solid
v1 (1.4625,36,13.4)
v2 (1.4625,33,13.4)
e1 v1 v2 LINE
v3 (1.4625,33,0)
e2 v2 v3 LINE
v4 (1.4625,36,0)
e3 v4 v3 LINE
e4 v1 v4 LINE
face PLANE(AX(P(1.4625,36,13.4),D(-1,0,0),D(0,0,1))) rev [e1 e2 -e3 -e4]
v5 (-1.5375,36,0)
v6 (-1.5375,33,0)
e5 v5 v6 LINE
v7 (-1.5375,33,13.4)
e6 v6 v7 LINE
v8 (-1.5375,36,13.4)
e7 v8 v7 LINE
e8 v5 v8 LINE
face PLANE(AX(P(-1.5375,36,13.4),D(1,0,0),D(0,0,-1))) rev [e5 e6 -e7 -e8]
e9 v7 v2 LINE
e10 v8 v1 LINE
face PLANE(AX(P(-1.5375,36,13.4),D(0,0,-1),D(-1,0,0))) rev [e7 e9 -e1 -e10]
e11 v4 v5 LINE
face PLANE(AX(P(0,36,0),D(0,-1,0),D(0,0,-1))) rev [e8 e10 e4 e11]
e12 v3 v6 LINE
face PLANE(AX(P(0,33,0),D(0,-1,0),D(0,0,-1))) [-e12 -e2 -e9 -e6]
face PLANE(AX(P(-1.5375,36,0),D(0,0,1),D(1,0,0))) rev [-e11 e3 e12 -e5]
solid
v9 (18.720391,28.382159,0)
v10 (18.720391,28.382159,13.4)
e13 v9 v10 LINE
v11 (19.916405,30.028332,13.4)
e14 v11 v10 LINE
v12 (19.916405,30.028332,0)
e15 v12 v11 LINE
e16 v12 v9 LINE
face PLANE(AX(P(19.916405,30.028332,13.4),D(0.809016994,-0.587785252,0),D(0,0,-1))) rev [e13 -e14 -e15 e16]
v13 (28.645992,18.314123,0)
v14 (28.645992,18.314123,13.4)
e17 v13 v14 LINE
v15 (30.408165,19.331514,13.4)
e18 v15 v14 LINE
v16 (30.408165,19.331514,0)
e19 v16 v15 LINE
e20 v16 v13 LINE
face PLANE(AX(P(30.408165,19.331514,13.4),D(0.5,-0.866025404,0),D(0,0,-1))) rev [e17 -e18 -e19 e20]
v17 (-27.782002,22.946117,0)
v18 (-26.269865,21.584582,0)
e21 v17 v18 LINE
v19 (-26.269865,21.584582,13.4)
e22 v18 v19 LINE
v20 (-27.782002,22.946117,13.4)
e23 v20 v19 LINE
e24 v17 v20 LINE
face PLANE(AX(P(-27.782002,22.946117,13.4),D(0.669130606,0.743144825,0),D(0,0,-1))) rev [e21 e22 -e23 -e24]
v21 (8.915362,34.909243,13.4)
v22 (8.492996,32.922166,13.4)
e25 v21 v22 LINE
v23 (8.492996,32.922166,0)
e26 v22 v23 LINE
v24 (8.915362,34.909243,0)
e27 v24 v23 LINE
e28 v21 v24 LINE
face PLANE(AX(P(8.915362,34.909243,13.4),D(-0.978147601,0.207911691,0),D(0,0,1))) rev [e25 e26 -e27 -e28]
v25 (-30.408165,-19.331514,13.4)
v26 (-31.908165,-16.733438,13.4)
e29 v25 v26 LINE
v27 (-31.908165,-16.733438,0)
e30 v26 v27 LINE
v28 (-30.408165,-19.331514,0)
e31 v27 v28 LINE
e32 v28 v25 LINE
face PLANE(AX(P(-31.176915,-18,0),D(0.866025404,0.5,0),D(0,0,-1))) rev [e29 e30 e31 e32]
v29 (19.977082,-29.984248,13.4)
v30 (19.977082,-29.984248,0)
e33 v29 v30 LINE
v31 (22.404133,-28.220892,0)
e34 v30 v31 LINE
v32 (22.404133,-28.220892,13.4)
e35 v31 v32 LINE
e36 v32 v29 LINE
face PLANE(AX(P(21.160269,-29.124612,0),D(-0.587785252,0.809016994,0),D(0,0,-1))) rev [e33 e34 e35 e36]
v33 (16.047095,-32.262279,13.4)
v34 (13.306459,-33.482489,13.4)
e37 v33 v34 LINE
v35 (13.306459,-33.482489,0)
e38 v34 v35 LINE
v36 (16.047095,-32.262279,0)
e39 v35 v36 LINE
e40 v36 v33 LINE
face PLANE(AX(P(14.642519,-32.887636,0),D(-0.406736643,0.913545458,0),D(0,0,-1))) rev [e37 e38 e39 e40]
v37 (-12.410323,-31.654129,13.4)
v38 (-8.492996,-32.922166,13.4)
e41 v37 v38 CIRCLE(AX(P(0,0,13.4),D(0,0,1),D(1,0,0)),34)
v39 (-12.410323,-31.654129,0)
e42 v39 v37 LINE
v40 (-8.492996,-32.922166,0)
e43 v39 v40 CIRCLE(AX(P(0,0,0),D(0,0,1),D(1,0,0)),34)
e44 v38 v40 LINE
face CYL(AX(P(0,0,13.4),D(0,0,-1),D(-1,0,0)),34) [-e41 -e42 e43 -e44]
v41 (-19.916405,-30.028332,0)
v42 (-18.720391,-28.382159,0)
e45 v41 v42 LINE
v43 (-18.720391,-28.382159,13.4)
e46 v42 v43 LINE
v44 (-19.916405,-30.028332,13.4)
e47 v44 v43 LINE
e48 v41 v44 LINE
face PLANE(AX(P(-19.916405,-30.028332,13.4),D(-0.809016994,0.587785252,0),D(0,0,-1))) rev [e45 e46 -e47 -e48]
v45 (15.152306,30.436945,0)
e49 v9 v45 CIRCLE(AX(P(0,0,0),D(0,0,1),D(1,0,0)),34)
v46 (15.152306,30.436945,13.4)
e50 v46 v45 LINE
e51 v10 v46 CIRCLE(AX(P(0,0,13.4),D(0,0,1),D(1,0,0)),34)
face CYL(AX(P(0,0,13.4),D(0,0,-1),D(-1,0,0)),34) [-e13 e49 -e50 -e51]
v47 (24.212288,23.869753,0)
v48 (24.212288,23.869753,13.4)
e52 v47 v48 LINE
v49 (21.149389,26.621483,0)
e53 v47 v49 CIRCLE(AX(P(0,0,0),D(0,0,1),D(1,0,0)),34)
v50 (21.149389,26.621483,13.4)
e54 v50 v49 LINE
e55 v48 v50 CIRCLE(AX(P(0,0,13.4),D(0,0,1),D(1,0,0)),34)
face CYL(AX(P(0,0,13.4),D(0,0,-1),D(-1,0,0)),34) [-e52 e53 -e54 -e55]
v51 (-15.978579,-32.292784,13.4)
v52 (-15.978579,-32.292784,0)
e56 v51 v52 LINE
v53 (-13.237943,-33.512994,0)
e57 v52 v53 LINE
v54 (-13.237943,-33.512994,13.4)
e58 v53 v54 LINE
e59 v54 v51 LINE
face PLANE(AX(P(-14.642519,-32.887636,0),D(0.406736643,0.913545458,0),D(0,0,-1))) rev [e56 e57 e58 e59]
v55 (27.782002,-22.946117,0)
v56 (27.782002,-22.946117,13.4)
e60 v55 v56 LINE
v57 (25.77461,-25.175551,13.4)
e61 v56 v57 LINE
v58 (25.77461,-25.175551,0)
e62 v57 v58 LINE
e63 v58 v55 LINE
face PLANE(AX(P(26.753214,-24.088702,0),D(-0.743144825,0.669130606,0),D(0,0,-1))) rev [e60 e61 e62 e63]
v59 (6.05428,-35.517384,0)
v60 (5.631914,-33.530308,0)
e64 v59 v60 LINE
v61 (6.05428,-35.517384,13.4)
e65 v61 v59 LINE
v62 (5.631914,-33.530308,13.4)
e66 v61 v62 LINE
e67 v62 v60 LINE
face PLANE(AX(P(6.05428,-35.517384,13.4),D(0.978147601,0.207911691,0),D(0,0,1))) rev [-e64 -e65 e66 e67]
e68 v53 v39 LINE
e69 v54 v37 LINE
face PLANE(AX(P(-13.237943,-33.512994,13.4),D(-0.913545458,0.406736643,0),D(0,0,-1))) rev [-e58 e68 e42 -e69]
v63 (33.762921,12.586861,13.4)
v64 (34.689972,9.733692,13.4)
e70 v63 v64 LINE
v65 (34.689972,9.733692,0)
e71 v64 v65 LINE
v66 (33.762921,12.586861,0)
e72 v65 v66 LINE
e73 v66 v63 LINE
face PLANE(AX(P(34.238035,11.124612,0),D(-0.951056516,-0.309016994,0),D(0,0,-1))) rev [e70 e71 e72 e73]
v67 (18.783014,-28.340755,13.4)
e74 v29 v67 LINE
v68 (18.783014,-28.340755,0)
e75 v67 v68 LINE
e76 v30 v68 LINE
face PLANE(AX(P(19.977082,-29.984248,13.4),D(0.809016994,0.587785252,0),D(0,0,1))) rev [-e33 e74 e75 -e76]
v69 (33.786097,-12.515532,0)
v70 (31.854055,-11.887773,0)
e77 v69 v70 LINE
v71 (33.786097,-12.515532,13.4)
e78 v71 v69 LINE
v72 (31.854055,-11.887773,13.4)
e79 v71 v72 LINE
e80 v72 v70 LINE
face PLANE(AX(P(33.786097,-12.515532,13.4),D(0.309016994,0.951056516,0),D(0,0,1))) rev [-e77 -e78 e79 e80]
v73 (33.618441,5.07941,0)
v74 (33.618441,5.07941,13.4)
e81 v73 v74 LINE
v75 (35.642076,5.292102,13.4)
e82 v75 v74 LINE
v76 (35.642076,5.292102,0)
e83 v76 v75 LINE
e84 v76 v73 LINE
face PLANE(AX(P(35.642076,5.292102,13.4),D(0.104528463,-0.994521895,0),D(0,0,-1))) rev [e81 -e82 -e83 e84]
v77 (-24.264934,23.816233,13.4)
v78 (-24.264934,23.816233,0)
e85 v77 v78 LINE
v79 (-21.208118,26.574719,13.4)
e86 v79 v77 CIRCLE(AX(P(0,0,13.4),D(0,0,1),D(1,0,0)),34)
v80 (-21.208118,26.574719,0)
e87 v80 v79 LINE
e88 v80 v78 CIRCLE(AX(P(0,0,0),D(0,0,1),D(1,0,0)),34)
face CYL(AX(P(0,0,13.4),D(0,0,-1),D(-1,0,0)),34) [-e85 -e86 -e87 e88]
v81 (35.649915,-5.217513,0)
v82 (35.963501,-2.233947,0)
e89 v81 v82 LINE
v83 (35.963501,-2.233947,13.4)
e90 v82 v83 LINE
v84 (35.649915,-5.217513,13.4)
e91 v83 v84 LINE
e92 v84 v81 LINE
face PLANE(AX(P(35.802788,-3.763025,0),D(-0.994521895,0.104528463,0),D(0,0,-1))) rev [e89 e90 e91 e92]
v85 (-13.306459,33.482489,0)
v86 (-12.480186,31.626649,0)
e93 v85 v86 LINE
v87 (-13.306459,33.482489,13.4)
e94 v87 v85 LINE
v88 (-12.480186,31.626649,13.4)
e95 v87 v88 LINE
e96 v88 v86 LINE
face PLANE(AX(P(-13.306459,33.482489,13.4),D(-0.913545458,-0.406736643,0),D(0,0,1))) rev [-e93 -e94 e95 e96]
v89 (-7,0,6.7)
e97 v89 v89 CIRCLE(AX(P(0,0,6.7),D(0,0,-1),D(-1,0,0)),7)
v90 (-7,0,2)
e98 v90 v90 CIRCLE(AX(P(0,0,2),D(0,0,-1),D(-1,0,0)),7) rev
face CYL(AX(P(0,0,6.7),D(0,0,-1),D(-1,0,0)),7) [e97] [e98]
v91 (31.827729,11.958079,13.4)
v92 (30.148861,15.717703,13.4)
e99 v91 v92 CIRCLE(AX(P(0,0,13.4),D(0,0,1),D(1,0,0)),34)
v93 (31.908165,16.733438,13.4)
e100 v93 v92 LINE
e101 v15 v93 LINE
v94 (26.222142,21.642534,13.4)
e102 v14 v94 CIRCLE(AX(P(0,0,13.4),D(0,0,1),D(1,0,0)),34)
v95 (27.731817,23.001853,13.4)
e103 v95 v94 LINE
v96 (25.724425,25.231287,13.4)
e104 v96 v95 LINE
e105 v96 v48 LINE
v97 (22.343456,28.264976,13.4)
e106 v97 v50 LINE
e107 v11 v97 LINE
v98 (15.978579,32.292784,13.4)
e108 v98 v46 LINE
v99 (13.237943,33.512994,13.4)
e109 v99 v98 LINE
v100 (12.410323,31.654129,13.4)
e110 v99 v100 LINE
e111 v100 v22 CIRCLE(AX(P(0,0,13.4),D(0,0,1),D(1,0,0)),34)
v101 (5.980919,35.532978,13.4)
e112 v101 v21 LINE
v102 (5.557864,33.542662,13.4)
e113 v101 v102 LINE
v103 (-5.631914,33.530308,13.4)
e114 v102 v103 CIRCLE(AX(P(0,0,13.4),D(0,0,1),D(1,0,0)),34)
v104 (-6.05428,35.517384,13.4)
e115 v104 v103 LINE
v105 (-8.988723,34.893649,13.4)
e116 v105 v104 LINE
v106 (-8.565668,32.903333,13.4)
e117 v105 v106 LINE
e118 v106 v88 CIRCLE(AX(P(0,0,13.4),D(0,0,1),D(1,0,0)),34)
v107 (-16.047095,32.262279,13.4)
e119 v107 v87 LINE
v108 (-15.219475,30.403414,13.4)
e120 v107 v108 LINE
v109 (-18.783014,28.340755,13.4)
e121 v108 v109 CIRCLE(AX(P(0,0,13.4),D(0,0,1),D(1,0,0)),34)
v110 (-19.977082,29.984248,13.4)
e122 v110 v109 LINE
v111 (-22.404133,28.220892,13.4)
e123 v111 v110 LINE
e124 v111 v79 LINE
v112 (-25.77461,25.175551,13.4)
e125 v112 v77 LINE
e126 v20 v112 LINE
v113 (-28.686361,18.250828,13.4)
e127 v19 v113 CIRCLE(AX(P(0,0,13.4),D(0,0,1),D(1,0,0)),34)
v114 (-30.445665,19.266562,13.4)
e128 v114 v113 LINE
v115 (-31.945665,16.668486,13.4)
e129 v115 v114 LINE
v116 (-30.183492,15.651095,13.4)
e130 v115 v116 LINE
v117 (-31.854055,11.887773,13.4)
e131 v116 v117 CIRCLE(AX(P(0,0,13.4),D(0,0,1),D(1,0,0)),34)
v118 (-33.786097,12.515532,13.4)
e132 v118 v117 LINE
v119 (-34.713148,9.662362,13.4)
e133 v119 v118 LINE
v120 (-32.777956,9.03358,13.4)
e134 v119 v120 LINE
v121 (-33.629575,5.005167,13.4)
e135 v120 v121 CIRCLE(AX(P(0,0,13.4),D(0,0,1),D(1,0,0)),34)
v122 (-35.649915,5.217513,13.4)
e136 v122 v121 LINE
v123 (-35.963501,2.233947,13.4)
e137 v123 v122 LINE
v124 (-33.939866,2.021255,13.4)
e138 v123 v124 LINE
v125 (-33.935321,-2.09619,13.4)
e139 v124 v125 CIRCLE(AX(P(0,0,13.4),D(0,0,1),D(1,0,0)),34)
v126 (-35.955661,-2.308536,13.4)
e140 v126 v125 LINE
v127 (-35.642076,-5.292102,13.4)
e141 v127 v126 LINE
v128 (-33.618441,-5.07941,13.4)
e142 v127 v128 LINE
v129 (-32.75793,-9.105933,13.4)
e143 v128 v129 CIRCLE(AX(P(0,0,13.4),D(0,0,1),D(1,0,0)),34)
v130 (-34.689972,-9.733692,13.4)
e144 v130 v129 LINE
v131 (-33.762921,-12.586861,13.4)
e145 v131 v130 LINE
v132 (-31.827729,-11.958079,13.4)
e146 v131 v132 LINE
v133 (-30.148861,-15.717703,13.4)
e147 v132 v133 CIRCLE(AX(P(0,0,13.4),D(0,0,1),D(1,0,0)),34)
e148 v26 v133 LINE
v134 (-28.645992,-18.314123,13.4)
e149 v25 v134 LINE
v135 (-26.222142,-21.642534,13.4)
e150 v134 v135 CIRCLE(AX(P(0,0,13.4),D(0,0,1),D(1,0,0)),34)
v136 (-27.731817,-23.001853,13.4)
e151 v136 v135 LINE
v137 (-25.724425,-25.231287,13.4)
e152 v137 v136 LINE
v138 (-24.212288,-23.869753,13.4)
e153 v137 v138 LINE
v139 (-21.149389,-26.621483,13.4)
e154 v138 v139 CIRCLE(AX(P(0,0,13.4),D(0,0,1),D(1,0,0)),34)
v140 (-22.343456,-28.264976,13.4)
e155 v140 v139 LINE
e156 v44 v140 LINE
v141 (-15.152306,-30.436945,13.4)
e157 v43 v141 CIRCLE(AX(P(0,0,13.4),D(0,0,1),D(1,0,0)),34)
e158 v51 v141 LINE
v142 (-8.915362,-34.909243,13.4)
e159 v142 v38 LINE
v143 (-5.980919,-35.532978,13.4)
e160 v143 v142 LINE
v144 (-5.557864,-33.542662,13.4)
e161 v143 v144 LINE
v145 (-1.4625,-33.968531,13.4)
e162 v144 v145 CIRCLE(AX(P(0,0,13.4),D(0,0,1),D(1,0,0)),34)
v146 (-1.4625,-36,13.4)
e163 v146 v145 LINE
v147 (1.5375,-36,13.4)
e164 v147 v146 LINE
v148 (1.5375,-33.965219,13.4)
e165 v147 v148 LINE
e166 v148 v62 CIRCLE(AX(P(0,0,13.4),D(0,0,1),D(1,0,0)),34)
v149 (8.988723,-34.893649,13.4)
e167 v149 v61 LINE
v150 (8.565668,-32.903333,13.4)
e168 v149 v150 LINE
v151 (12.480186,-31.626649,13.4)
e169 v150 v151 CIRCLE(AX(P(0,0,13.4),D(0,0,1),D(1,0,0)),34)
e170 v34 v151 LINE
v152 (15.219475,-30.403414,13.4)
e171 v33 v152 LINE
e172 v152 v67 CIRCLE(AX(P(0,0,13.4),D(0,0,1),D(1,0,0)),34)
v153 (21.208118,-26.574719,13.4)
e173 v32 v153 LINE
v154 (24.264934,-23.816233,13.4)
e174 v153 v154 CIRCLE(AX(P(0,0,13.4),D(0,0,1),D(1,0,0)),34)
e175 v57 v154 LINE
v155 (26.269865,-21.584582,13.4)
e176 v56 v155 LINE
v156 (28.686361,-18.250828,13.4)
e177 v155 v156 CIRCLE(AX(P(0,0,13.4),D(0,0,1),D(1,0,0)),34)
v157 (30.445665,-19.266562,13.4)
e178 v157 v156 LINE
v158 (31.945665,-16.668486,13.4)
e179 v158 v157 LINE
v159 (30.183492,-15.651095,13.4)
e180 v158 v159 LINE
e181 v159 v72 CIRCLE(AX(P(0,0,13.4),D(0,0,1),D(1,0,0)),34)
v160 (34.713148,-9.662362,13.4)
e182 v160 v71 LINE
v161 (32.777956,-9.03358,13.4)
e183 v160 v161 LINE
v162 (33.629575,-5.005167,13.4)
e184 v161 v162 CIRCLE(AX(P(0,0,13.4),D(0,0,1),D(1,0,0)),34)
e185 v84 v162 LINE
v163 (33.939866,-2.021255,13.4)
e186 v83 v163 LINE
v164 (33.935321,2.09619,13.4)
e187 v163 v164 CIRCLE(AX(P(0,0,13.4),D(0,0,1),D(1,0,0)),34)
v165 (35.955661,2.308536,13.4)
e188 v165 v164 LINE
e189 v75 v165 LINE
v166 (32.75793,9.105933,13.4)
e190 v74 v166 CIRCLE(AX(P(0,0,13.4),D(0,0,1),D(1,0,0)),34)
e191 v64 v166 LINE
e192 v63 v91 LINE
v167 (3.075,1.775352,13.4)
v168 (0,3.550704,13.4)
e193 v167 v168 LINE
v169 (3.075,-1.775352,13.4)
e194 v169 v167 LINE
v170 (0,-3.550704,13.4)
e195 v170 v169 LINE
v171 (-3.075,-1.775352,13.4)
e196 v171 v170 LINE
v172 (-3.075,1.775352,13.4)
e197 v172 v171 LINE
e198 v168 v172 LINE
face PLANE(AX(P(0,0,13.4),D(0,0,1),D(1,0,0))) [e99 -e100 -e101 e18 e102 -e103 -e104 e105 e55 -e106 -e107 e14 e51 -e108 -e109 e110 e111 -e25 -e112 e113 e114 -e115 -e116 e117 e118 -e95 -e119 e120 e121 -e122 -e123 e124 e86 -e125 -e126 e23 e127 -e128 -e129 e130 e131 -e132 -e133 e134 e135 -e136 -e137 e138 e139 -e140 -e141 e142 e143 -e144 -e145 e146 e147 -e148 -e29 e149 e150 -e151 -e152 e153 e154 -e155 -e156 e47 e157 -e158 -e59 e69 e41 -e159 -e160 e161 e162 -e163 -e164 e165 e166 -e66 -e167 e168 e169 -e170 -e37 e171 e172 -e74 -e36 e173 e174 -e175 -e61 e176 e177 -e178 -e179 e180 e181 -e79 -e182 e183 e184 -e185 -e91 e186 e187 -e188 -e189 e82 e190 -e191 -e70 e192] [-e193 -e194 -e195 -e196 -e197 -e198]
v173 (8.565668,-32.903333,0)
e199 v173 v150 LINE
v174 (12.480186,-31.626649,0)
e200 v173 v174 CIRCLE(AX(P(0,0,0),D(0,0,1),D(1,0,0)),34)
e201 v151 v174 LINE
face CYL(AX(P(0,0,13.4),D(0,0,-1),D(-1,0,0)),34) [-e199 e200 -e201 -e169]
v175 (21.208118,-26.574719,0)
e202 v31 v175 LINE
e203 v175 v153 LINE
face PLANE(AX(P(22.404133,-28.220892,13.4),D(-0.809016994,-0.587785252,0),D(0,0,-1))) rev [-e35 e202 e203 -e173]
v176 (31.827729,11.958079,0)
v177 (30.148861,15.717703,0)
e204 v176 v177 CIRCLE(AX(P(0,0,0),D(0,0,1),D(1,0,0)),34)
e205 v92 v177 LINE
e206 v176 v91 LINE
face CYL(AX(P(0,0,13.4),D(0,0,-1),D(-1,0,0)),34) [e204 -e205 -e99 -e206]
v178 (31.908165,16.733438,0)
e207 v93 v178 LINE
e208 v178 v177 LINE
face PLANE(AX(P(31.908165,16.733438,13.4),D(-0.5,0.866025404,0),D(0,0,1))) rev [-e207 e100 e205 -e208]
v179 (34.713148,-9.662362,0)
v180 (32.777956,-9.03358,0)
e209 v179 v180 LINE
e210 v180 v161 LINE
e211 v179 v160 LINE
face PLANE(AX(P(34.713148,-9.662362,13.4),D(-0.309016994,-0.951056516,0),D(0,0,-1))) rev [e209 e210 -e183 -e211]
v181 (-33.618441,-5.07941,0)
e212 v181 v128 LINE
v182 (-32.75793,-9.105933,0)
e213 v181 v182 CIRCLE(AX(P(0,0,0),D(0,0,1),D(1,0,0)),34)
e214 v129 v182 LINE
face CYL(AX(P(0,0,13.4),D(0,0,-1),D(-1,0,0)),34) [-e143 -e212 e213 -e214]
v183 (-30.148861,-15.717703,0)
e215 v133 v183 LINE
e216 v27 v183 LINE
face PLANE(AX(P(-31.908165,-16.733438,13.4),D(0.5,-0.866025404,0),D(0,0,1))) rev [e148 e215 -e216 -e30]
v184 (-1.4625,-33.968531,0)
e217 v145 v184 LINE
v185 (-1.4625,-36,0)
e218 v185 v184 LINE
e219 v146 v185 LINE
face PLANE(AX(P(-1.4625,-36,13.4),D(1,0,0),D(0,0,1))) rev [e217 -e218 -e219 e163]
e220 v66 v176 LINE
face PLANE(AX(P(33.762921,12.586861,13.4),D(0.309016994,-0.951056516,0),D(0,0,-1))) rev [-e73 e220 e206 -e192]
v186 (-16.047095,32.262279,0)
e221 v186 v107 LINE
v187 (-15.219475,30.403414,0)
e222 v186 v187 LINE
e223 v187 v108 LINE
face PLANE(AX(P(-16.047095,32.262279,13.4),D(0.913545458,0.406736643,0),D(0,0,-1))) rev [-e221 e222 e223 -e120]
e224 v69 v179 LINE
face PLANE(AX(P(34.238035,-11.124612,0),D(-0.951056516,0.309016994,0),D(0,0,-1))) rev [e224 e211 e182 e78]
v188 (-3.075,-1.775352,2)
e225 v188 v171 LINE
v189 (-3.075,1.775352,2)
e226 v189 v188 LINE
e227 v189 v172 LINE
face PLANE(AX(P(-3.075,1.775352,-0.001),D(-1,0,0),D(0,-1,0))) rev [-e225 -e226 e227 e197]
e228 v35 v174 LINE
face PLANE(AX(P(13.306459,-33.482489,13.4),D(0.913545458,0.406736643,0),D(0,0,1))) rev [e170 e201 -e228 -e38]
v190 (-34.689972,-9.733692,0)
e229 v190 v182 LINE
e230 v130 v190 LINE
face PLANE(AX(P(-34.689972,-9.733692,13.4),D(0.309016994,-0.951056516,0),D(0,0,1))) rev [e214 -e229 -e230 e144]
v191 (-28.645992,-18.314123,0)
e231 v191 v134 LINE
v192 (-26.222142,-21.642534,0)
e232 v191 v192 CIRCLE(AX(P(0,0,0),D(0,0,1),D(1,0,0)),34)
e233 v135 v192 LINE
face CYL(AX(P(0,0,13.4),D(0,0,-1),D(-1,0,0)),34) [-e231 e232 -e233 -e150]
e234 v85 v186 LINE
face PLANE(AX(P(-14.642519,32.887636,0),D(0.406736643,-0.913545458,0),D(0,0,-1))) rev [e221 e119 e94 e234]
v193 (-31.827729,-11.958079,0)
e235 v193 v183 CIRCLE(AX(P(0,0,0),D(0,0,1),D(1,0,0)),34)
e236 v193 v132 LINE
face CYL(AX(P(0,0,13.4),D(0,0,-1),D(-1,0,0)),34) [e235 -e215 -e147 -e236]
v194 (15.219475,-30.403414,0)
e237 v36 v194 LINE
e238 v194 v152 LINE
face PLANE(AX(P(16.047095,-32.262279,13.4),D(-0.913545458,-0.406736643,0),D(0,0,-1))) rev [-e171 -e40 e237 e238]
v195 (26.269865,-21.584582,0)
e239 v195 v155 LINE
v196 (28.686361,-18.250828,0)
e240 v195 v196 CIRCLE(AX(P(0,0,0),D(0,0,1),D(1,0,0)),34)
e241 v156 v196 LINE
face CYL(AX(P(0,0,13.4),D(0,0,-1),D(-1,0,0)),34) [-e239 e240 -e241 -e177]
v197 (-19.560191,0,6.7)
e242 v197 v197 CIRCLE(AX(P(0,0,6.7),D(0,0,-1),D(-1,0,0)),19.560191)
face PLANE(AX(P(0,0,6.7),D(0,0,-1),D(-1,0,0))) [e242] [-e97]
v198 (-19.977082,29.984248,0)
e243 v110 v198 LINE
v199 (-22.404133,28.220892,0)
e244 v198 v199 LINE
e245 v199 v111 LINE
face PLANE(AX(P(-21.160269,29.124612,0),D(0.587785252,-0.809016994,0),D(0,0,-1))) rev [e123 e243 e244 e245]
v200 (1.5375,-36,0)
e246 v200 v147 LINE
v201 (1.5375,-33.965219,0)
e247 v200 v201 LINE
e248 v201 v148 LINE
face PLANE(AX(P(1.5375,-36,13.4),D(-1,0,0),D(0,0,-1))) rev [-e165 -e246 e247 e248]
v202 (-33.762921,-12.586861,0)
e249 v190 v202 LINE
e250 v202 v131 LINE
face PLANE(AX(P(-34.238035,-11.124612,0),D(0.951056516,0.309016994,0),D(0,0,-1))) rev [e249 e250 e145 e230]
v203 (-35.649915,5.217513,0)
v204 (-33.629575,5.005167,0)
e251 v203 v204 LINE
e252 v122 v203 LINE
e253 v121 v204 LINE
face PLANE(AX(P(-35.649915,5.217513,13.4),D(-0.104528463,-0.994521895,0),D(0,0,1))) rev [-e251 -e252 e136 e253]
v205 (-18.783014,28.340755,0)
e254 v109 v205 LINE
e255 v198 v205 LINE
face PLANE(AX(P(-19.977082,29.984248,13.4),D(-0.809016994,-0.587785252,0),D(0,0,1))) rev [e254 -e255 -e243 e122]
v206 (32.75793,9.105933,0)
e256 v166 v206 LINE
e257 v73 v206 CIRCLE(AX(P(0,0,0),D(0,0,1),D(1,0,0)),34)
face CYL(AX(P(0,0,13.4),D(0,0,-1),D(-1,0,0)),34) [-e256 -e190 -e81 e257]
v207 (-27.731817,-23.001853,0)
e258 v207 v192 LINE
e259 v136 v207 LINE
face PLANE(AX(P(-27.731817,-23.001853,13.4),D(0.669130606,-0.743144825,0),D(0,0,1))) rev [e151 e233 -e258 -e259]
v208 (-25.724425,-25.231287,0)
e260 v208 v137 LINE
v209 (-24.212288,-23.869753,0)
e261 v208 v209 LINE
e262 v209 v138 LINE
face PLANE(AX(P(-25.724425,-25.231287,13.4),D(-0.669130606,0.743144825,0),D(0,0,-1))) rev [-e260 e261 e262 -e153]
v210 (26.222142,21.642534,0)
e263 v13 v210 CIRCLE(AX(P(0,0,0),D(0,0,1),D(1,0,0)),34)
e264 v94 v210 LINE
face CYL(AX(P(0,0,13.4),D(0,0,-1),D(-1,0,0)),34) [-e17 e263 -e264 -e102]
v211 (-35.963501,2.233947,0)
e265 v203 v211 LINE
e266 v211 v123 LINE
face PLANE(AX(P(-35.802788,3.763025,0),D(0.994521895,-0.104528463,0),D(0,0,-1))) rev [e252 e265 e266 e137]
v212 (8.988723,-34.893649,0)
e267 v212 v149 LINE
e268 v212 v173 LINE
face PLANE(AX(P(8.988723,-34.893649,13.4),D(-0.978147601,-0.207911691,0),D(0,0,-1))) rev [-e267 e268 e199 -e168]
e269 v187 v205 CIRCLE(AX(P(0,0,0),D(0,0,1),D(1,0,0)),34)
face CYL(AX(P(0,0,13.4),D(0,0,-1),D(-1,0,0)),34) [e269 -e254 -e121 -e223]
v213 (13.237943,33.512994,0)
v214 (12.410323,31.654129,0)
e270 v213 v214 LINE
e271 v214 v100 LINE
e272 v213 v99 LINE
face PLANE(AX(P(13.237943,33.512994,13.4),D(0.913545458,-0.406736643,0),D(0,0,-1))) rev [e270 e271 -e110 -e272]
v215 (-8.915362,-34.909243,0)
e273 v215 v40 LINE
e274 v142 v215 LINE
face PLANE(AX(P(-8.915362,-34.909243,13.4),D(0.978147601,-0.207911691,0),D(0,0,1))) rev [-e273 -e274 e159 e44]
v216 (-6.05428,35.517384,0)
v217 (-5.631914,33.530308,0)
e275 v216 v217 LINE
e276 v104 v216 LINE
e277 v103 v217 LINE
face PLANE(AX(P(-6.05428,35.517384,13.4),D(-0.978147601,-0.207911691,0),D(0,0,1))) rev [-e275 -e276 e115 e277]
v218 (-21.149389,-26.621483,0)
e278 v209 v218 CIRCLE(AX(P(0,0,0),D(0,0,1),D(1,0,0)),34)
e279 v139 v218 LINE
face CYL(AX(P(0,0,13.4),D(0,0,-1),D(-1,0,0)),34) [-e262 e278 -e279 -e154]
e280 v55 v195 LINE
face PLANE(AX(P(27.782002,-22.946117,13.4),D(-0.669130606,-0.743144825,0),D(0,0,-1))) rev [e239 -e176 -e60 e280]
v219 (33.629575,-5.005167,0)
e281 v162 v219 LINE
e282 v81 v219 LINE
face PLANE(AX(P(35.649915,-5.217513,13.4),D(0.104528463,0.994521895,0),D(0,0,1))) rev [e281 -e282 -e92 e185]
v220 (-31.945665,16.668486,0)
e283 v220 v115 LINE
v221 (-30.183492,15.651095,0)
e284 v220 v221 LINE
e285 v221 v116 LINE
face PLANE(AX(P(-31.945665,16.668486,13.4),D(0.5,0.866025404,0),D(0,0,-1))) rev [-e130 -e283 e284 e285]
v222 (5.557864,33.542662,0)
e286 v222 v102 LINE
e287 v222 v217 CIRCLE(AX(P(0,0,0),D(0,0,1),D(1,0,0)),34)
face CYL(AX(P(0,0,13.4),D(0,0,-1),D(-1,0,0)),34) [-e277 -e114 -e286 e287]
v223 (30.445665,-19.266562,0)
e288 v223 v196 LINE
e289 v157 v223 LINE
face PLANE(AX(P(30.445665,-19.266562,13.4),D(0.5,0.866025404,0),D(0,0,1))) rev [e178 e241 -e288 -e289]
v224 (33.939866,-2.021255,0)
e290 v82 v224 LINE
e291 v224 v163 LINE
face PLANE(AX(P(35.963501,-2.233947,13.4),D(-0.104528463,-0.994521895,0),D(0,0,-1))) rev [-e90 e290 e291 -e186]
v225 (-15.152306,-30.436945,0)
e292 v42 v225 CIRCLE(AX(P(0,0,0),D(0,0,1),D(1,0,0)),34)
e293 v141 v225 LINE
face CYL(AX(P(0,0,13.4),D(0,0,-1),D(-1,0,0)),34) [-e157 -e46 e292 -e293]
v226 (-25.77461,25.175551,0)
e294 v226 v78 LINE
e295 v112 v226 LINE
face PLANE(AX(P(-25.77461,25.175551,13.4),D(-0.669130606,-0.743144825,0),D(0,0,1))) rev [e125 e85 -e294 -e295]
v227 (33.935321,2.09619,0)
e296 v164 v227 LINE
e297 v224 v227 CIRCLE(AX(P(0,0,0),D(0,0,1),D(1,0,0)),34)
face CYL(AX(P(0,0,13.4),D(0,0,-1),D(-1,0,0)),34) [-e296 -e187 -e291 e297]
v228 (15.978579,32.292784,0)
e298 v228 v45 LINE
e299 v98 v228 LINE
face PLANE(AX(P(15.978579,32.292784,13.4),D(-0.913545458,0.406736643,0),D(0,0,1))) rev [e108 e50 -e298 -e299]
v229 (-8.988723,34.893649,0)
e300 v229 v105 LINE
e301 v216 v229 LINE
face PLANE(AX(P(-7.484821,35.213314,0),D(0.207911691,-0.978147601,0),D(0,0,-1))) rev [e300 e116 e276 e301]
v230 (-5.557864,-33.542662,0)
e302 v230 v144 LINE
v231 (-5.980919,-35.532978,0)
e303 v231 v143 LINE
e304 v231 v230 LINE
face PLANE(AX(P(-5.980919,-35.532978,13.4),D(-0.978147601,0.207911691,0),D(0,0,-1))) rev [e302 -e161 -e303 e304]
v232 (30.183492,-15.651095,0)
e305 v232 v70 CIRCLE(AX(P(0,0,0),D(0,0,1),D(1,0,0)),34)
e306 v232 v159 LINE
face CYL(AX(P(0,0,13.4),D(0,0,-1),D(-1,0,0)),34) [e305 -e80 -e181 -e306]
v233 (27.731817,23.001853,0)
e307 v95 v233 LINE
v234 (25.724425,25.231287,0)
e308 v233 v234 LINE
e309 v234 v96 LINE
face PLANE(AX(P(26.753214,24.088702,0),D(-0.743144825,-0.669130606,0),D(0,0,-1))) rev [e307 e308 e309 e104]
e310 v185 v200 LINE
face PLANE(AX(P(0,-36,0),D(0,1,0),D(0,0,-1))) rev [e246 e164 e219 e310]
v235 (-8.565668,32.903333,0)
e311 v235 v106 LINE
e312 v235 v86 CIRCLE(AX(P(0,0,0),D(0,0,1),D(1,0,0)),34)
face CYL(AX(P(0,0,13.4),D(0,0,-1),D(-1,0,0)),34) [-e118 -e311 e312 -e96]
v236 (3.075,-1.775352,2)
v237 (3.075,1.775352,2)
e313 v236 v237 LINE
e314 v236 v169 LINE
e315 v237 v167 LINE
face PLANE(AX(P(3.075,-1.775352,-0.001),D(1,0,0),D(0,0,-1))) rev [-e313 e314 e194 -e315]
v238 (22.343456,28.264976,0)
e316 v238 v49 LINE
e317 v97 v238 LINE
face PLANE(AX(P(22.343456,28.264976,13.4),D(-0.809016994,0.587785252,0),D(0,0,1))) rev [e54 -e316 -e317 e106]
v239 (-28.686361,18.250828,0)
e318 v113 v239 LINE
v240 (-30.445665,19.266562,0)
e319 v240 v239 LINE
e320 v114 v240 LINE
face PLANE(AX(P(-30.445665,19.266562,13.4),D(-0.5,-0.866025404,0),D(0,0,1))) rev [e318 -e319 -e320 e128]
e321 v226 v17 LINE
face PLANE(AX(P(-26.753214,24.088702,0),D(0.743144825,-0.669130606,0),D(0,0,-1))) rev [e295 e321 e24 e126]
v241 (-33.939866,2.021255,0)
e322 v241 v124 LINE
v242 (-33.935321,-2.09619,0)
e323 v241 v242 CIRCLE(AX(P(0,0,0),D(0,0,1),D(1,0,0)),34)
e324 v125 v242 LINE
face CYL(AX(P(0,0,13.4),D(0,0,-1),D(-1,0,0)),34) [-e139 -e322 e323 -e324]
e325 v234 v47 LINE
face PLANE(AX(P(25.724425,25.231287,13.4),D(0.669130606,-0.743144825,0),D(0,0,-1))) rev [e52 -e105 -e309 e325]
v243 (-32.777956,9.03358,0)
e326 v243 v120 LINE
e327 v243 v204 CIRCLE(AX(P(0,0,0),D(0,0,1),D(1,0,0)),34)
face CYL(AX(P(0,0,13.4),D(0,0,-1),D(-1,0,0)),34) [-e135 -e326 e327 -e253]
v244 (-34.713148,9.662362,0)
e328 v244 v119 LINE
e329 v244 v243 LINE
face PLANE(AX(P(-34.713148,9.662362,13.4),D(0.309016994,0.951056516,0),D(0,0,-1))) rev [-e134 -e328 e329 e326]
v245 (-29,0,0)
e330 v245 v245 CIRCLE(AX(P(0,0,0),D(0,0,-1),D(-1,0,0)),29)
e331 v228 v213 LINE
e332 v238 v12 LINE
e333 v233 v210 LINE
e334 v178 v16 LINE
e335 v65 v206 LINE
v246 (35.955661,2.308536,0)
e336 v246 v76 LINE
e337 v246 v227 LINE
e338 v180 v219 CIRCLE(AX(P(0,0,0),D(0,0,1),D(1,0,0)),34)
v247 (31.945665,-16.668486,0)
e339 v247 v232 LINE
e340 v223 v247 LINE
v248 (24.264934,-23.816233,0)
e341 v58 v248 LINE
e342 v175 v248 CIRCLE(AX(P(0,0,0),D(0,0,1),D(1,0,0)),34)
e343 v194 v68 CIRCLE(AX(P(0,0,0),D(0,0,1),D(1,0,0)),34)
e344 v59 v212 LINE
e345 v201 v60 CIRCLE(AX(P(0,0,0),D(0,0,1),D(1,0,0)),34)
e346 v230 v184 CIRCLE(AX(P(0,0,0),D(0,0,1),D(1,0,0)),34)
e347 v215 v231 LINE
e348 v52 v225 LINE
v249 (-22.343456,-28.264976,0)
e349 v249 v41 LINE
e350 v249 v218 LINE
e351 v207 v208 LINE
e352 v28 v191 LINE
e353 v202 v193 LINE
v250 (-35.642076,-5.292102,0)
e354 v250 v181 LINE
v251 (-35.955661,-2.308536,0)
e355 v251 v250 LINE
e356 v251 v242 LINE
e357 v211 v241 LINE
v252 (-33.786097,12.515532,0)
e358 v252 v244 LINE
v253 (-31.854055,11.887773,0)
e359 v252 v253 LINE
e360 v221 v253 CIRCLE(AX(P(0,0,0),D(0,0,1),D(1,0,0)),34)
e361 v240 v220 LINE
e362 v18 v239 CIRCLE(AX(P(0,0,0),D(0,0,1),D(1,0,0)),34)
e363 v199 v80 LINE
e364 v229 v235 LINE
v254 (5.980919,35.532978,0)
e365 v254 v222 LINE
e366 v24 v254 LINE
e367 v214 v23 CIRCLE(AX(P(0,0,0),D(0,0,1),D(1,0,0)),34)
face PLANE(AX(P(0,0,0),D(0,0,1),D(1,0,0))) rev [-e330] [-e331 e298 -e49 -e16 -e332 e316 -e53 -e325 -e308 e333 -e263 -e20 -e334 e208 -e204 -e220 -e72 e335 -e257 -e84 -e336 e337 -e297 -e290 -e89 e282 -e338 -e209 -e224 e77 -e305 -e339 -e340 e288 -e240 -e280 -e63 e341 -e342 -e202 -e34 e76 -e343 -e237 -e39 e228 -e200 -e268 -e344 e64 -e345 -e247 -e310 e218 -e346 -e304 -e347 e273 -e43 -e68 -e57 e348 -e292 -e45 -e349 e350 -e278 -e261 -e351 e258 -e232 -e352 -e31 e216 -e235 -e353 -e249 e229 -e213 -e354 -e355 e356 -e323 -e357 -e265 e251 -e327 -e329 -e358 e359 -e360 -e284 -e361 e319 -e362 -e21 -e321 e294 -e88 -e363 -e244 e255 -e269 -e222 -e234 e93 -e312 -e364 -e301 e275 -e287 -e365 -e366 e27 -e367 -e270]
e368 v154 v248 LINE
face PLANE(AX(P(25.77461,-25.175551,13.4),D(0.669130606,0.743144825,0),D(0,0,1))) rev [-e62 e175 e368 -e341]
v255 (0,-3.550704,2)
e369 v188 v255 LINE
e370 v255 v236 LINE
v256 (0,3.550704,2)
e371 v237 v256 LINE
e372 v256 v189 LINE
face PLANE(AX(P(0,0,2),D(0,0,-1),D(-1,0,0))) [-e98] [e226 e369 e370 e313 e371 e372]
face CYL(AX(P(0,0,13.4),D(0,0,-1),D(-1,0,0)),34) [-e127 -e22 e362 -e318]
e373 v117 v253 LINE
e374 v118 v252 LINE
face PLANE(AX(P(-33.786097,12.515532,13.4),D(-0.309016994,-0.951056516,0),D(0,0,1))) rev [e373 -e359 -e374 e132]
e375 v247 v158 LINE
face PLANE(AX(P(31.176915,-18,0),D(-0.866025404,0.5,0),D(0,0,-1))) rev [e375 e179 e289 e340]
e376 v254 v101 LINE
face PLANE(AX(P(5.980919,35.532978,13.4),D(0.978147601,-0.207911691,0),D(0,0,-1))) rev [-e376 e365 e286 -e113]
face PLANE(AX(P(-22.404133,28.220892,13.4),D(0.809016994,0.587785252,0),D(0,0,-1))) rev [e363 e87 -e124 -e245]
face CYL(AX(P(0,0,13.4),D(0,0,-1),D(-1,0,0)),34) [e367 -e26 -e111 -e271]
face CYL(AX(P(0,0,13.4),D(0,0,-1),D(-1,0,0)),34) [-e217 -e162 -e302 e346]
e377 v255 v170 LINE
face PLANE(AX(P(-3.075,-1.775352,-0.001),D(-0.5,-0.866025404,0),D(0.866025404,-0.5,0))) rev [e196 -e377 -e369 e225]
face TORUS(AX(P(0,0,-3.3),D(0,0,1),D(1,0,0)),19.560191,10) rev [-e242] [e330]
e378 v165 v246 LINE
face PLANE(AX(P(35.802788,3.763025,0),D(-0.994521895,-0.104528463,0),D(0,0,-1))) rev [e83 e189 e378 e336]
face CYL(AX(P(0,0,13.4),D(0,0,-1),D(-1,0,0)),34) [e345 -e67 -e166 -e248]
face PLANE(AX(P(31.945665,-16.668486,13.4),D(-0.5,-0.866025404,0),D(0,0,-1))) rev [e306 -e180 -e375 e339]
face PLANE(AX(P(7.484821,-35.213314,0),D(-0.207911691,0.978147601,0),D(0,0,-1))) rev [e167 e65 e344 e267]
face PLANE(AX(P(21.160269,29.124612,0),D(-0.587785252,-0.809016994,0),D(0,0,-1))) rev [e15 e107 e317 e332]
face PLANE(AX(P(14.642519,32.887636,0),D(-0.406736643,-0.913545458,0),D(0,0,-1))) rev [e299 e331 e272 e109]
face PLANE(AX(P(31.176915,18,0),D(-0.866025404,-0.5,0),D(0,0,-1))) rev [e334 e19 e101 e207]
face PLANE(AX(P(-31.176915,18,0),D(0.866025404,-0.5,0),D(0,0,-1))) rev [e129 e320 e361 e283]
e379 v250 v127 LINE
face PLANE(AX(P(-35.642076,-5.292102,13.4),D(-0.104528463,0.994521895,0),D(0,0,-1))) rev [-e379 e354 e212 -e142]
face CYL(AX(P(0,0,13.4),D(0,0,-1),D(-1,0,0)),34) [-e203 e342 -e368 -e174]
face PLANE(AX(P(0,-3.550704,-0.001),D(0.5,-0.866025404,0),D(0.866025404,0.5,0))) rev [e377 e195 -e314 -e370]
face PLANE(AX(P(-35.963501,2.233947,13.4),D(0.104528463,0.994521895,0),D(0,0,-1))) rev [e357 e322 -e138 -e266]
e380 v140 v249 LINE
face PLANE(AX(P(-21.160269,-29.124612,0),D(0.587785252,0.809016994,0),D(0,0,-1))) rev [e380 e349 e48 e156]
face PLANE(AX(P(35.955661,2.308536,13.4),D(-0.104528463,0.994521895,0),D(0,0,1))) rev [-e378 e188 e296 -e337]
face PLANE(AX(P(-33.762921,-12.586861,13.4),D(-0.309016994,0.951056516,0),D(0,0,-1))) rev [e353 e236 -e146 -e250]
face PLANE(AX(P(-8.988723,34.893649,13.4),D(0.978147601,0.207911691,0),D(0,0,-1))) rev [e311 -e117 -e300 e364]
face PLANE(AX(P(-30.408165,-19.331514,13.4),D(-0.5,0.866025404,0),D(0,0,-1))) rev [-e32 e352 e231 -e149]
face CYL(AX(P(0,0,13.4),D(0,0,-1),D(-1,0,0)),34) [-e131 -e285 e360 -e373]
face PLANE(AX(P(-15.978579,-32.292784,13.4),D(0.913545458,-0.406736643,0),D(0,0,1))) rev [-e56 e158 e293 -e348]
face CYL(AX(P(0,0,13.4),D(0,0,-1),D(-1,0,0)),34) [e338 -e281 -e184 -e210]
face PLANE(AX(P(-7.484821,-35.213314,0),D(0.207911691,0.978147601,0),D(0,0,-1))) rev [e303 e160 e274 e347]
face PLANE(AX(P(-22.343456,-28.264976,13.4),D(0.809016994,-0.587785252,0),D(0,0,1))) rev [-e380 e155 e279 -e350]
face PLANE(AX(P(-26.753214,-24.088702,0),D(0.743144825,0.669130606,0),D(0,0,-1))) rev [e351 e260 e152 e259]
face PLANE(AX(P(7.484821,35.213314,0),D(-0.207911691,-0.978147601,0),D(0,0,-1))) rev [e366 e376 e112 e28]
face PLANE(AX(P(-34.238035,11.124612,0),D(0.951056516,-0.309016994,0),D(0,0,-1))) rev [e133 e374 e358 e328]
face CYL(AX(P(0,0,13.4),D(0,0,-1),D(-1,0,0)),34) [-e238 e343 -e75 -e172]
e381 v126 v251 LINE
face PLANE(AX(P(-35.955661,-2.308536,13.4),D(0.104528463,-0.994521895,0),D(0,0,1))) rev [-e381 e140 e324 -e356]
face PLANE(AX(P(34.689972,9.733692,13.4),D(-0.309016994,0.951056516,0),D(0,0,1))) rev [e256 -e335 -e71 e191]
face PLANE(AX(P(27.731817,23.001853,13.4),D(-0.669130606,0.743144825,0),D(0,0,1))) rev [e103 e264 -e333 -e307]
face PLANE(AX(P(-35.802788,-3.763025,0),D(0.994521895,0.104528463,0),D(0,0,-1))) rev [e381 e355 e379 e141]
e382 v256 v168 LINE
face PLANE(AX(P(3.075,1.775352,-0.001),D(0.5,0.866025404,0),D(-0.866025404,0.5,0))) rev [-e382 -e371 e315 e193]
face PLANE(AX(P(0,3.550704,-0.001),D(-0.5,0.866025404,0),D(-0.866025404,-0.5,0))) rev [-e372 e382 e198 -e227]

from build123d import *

# Parameters (mm, degrees)
SKETCH1_R           = 34
BOSS_EXTRUDE1_DEPTH = 13.4
CUT_EXTRUDE1_REACH  = 51.916
BOSS_EXTRUDE3_START = 33
SKETCH9_W           = 3
SKETCH9_H           = 13.4
BOSS_EXTRUDE3_DEPTH = 3
CIRPATTERN11_COUNT  = 30
SKETCH12_R          = 29
SKETCH12_R_2        = 7
CUT_EXTRUDE6_DEPTH  = 6.7
SKETCH14_R          = 7.869119163
CUT_EXTRUDE7_DEPTH  = 2
FILLET1_R           = 10


with BuildPart() as part:
    # Sketch1 → Boss-Extrude1 (new body)
    with BuildSketch(Plane.XY):
        Circle(SKETCH1_R)
    extrude(amount=BOSS_EXTRUDE1_DEPTH)

    # Sketch2 → Cut-Extrude1 (cut, up to next)
    with BuildSketch(Plane.XY.offset(13.4), mode=Mode.PRIVATE) as cut_extrude1_sk1:
        Polygon((0, -3.550704156), (3.075, -1.775352078), (3.075, 1.775352078), (0, 3.550704156), (-3.075, 1.775352078), (-3.075, -1.775352078), align=None)
    cut_extrude1_tool1 = extrude(cut_extrude1_sk1.sketch, amount=-CUT_EXTRUDE1_REACH, mode=Mode.PRIVATE) & part.part
    add(cut_extrude1_tool1.solids().sort_by_distance((0, 0, 13.4))[0], mode=Mode.SUBTRACT)


with BuildPart() as body_2:
    # Sketch9 → Boss-Extrude3 (new body)
    with BuildSketch(Plane(origin=(0, 0, 0), x_dir=(1, 0, 0), z_dir=(0, 1, 0)).offset(BOSS_EXTRUDE3_START)):
        with Locations((-0.0375, -6.7)):
            Rectangle(SKETCH9_W, SKETCH9_H)
    boss_extrude3 = extrude(amount=BOSS_EXTRUDE3_DEPTH)


with BuildPart() as part_1:
    add(part.part)

    # CirPattern11: Boss-Extrude3 ×30 about axis
    cirpattern11_axis = Axis((0, 0, 0), (0, 0, 1))
    for i in range(1, CIRPATTERN11_COUNT):
        add(boss_extrude3.rotate(cirpattern11_axis, i * 360 / CIRPATTERN11_COUNT))

    # Sketch12 → Cut-Extrude6 (cut)
    with BuildSketch(Plane(origin=(0, 0, 0), x_dir=(-1, 0, 0), z_dir=(0, 0, -1))):
        Circle(SKETCH12_R)
        Circle(SKETCH12_R_2, mode=Mode.SUBTRACT)
    extrude(amount=-CUT_EXTRUDE6_DEPTH, mode=Mode.SUBTRACT)

    # Sketch14 → Cut-Extrude7 (cut)
    with BuildSketch(Plane(origin=(0, 0, 0), x_dir=(-1, 0, 0), z_dir=(0, 0, -1))):
        Circle(SKETCH14_R)
    extrude(amount=-CUT_EXTRUDE7_DEPTH, mode=Mode.SUBTRACT)

    # Fillet1
    # the kernel refuses this fillet: 10 mm, written as the material it adds along each edge
    with BuildSketch(Plane(origin=(0, 0, 6.7), x_dir=(-1, 0, 0), z_dir=(0, -1, 0))) as fillet1_piece_1:
        with BuildLine():
            CenterArc((19.56019068, 10), FILLET1_R, 270, 70.731224509)
            Line((19.56019068, 0), (19.56019068, -0.2))
            Line((19.56019068, -0.2), (29, -0.2))
            Line((29, -0.2), (29.2, 0))
            ThreePointArc((29.2, 0), (29.2, 3.35), (29.188796186, 6.634))
            Line((29.188796186, 6.634), (29, 6.7))
        make_face()
    revolve(axis=Axis((0, 0, 6.7), (0, 0, -1)))


solid = Compound([body_2.part, part_1.part])
